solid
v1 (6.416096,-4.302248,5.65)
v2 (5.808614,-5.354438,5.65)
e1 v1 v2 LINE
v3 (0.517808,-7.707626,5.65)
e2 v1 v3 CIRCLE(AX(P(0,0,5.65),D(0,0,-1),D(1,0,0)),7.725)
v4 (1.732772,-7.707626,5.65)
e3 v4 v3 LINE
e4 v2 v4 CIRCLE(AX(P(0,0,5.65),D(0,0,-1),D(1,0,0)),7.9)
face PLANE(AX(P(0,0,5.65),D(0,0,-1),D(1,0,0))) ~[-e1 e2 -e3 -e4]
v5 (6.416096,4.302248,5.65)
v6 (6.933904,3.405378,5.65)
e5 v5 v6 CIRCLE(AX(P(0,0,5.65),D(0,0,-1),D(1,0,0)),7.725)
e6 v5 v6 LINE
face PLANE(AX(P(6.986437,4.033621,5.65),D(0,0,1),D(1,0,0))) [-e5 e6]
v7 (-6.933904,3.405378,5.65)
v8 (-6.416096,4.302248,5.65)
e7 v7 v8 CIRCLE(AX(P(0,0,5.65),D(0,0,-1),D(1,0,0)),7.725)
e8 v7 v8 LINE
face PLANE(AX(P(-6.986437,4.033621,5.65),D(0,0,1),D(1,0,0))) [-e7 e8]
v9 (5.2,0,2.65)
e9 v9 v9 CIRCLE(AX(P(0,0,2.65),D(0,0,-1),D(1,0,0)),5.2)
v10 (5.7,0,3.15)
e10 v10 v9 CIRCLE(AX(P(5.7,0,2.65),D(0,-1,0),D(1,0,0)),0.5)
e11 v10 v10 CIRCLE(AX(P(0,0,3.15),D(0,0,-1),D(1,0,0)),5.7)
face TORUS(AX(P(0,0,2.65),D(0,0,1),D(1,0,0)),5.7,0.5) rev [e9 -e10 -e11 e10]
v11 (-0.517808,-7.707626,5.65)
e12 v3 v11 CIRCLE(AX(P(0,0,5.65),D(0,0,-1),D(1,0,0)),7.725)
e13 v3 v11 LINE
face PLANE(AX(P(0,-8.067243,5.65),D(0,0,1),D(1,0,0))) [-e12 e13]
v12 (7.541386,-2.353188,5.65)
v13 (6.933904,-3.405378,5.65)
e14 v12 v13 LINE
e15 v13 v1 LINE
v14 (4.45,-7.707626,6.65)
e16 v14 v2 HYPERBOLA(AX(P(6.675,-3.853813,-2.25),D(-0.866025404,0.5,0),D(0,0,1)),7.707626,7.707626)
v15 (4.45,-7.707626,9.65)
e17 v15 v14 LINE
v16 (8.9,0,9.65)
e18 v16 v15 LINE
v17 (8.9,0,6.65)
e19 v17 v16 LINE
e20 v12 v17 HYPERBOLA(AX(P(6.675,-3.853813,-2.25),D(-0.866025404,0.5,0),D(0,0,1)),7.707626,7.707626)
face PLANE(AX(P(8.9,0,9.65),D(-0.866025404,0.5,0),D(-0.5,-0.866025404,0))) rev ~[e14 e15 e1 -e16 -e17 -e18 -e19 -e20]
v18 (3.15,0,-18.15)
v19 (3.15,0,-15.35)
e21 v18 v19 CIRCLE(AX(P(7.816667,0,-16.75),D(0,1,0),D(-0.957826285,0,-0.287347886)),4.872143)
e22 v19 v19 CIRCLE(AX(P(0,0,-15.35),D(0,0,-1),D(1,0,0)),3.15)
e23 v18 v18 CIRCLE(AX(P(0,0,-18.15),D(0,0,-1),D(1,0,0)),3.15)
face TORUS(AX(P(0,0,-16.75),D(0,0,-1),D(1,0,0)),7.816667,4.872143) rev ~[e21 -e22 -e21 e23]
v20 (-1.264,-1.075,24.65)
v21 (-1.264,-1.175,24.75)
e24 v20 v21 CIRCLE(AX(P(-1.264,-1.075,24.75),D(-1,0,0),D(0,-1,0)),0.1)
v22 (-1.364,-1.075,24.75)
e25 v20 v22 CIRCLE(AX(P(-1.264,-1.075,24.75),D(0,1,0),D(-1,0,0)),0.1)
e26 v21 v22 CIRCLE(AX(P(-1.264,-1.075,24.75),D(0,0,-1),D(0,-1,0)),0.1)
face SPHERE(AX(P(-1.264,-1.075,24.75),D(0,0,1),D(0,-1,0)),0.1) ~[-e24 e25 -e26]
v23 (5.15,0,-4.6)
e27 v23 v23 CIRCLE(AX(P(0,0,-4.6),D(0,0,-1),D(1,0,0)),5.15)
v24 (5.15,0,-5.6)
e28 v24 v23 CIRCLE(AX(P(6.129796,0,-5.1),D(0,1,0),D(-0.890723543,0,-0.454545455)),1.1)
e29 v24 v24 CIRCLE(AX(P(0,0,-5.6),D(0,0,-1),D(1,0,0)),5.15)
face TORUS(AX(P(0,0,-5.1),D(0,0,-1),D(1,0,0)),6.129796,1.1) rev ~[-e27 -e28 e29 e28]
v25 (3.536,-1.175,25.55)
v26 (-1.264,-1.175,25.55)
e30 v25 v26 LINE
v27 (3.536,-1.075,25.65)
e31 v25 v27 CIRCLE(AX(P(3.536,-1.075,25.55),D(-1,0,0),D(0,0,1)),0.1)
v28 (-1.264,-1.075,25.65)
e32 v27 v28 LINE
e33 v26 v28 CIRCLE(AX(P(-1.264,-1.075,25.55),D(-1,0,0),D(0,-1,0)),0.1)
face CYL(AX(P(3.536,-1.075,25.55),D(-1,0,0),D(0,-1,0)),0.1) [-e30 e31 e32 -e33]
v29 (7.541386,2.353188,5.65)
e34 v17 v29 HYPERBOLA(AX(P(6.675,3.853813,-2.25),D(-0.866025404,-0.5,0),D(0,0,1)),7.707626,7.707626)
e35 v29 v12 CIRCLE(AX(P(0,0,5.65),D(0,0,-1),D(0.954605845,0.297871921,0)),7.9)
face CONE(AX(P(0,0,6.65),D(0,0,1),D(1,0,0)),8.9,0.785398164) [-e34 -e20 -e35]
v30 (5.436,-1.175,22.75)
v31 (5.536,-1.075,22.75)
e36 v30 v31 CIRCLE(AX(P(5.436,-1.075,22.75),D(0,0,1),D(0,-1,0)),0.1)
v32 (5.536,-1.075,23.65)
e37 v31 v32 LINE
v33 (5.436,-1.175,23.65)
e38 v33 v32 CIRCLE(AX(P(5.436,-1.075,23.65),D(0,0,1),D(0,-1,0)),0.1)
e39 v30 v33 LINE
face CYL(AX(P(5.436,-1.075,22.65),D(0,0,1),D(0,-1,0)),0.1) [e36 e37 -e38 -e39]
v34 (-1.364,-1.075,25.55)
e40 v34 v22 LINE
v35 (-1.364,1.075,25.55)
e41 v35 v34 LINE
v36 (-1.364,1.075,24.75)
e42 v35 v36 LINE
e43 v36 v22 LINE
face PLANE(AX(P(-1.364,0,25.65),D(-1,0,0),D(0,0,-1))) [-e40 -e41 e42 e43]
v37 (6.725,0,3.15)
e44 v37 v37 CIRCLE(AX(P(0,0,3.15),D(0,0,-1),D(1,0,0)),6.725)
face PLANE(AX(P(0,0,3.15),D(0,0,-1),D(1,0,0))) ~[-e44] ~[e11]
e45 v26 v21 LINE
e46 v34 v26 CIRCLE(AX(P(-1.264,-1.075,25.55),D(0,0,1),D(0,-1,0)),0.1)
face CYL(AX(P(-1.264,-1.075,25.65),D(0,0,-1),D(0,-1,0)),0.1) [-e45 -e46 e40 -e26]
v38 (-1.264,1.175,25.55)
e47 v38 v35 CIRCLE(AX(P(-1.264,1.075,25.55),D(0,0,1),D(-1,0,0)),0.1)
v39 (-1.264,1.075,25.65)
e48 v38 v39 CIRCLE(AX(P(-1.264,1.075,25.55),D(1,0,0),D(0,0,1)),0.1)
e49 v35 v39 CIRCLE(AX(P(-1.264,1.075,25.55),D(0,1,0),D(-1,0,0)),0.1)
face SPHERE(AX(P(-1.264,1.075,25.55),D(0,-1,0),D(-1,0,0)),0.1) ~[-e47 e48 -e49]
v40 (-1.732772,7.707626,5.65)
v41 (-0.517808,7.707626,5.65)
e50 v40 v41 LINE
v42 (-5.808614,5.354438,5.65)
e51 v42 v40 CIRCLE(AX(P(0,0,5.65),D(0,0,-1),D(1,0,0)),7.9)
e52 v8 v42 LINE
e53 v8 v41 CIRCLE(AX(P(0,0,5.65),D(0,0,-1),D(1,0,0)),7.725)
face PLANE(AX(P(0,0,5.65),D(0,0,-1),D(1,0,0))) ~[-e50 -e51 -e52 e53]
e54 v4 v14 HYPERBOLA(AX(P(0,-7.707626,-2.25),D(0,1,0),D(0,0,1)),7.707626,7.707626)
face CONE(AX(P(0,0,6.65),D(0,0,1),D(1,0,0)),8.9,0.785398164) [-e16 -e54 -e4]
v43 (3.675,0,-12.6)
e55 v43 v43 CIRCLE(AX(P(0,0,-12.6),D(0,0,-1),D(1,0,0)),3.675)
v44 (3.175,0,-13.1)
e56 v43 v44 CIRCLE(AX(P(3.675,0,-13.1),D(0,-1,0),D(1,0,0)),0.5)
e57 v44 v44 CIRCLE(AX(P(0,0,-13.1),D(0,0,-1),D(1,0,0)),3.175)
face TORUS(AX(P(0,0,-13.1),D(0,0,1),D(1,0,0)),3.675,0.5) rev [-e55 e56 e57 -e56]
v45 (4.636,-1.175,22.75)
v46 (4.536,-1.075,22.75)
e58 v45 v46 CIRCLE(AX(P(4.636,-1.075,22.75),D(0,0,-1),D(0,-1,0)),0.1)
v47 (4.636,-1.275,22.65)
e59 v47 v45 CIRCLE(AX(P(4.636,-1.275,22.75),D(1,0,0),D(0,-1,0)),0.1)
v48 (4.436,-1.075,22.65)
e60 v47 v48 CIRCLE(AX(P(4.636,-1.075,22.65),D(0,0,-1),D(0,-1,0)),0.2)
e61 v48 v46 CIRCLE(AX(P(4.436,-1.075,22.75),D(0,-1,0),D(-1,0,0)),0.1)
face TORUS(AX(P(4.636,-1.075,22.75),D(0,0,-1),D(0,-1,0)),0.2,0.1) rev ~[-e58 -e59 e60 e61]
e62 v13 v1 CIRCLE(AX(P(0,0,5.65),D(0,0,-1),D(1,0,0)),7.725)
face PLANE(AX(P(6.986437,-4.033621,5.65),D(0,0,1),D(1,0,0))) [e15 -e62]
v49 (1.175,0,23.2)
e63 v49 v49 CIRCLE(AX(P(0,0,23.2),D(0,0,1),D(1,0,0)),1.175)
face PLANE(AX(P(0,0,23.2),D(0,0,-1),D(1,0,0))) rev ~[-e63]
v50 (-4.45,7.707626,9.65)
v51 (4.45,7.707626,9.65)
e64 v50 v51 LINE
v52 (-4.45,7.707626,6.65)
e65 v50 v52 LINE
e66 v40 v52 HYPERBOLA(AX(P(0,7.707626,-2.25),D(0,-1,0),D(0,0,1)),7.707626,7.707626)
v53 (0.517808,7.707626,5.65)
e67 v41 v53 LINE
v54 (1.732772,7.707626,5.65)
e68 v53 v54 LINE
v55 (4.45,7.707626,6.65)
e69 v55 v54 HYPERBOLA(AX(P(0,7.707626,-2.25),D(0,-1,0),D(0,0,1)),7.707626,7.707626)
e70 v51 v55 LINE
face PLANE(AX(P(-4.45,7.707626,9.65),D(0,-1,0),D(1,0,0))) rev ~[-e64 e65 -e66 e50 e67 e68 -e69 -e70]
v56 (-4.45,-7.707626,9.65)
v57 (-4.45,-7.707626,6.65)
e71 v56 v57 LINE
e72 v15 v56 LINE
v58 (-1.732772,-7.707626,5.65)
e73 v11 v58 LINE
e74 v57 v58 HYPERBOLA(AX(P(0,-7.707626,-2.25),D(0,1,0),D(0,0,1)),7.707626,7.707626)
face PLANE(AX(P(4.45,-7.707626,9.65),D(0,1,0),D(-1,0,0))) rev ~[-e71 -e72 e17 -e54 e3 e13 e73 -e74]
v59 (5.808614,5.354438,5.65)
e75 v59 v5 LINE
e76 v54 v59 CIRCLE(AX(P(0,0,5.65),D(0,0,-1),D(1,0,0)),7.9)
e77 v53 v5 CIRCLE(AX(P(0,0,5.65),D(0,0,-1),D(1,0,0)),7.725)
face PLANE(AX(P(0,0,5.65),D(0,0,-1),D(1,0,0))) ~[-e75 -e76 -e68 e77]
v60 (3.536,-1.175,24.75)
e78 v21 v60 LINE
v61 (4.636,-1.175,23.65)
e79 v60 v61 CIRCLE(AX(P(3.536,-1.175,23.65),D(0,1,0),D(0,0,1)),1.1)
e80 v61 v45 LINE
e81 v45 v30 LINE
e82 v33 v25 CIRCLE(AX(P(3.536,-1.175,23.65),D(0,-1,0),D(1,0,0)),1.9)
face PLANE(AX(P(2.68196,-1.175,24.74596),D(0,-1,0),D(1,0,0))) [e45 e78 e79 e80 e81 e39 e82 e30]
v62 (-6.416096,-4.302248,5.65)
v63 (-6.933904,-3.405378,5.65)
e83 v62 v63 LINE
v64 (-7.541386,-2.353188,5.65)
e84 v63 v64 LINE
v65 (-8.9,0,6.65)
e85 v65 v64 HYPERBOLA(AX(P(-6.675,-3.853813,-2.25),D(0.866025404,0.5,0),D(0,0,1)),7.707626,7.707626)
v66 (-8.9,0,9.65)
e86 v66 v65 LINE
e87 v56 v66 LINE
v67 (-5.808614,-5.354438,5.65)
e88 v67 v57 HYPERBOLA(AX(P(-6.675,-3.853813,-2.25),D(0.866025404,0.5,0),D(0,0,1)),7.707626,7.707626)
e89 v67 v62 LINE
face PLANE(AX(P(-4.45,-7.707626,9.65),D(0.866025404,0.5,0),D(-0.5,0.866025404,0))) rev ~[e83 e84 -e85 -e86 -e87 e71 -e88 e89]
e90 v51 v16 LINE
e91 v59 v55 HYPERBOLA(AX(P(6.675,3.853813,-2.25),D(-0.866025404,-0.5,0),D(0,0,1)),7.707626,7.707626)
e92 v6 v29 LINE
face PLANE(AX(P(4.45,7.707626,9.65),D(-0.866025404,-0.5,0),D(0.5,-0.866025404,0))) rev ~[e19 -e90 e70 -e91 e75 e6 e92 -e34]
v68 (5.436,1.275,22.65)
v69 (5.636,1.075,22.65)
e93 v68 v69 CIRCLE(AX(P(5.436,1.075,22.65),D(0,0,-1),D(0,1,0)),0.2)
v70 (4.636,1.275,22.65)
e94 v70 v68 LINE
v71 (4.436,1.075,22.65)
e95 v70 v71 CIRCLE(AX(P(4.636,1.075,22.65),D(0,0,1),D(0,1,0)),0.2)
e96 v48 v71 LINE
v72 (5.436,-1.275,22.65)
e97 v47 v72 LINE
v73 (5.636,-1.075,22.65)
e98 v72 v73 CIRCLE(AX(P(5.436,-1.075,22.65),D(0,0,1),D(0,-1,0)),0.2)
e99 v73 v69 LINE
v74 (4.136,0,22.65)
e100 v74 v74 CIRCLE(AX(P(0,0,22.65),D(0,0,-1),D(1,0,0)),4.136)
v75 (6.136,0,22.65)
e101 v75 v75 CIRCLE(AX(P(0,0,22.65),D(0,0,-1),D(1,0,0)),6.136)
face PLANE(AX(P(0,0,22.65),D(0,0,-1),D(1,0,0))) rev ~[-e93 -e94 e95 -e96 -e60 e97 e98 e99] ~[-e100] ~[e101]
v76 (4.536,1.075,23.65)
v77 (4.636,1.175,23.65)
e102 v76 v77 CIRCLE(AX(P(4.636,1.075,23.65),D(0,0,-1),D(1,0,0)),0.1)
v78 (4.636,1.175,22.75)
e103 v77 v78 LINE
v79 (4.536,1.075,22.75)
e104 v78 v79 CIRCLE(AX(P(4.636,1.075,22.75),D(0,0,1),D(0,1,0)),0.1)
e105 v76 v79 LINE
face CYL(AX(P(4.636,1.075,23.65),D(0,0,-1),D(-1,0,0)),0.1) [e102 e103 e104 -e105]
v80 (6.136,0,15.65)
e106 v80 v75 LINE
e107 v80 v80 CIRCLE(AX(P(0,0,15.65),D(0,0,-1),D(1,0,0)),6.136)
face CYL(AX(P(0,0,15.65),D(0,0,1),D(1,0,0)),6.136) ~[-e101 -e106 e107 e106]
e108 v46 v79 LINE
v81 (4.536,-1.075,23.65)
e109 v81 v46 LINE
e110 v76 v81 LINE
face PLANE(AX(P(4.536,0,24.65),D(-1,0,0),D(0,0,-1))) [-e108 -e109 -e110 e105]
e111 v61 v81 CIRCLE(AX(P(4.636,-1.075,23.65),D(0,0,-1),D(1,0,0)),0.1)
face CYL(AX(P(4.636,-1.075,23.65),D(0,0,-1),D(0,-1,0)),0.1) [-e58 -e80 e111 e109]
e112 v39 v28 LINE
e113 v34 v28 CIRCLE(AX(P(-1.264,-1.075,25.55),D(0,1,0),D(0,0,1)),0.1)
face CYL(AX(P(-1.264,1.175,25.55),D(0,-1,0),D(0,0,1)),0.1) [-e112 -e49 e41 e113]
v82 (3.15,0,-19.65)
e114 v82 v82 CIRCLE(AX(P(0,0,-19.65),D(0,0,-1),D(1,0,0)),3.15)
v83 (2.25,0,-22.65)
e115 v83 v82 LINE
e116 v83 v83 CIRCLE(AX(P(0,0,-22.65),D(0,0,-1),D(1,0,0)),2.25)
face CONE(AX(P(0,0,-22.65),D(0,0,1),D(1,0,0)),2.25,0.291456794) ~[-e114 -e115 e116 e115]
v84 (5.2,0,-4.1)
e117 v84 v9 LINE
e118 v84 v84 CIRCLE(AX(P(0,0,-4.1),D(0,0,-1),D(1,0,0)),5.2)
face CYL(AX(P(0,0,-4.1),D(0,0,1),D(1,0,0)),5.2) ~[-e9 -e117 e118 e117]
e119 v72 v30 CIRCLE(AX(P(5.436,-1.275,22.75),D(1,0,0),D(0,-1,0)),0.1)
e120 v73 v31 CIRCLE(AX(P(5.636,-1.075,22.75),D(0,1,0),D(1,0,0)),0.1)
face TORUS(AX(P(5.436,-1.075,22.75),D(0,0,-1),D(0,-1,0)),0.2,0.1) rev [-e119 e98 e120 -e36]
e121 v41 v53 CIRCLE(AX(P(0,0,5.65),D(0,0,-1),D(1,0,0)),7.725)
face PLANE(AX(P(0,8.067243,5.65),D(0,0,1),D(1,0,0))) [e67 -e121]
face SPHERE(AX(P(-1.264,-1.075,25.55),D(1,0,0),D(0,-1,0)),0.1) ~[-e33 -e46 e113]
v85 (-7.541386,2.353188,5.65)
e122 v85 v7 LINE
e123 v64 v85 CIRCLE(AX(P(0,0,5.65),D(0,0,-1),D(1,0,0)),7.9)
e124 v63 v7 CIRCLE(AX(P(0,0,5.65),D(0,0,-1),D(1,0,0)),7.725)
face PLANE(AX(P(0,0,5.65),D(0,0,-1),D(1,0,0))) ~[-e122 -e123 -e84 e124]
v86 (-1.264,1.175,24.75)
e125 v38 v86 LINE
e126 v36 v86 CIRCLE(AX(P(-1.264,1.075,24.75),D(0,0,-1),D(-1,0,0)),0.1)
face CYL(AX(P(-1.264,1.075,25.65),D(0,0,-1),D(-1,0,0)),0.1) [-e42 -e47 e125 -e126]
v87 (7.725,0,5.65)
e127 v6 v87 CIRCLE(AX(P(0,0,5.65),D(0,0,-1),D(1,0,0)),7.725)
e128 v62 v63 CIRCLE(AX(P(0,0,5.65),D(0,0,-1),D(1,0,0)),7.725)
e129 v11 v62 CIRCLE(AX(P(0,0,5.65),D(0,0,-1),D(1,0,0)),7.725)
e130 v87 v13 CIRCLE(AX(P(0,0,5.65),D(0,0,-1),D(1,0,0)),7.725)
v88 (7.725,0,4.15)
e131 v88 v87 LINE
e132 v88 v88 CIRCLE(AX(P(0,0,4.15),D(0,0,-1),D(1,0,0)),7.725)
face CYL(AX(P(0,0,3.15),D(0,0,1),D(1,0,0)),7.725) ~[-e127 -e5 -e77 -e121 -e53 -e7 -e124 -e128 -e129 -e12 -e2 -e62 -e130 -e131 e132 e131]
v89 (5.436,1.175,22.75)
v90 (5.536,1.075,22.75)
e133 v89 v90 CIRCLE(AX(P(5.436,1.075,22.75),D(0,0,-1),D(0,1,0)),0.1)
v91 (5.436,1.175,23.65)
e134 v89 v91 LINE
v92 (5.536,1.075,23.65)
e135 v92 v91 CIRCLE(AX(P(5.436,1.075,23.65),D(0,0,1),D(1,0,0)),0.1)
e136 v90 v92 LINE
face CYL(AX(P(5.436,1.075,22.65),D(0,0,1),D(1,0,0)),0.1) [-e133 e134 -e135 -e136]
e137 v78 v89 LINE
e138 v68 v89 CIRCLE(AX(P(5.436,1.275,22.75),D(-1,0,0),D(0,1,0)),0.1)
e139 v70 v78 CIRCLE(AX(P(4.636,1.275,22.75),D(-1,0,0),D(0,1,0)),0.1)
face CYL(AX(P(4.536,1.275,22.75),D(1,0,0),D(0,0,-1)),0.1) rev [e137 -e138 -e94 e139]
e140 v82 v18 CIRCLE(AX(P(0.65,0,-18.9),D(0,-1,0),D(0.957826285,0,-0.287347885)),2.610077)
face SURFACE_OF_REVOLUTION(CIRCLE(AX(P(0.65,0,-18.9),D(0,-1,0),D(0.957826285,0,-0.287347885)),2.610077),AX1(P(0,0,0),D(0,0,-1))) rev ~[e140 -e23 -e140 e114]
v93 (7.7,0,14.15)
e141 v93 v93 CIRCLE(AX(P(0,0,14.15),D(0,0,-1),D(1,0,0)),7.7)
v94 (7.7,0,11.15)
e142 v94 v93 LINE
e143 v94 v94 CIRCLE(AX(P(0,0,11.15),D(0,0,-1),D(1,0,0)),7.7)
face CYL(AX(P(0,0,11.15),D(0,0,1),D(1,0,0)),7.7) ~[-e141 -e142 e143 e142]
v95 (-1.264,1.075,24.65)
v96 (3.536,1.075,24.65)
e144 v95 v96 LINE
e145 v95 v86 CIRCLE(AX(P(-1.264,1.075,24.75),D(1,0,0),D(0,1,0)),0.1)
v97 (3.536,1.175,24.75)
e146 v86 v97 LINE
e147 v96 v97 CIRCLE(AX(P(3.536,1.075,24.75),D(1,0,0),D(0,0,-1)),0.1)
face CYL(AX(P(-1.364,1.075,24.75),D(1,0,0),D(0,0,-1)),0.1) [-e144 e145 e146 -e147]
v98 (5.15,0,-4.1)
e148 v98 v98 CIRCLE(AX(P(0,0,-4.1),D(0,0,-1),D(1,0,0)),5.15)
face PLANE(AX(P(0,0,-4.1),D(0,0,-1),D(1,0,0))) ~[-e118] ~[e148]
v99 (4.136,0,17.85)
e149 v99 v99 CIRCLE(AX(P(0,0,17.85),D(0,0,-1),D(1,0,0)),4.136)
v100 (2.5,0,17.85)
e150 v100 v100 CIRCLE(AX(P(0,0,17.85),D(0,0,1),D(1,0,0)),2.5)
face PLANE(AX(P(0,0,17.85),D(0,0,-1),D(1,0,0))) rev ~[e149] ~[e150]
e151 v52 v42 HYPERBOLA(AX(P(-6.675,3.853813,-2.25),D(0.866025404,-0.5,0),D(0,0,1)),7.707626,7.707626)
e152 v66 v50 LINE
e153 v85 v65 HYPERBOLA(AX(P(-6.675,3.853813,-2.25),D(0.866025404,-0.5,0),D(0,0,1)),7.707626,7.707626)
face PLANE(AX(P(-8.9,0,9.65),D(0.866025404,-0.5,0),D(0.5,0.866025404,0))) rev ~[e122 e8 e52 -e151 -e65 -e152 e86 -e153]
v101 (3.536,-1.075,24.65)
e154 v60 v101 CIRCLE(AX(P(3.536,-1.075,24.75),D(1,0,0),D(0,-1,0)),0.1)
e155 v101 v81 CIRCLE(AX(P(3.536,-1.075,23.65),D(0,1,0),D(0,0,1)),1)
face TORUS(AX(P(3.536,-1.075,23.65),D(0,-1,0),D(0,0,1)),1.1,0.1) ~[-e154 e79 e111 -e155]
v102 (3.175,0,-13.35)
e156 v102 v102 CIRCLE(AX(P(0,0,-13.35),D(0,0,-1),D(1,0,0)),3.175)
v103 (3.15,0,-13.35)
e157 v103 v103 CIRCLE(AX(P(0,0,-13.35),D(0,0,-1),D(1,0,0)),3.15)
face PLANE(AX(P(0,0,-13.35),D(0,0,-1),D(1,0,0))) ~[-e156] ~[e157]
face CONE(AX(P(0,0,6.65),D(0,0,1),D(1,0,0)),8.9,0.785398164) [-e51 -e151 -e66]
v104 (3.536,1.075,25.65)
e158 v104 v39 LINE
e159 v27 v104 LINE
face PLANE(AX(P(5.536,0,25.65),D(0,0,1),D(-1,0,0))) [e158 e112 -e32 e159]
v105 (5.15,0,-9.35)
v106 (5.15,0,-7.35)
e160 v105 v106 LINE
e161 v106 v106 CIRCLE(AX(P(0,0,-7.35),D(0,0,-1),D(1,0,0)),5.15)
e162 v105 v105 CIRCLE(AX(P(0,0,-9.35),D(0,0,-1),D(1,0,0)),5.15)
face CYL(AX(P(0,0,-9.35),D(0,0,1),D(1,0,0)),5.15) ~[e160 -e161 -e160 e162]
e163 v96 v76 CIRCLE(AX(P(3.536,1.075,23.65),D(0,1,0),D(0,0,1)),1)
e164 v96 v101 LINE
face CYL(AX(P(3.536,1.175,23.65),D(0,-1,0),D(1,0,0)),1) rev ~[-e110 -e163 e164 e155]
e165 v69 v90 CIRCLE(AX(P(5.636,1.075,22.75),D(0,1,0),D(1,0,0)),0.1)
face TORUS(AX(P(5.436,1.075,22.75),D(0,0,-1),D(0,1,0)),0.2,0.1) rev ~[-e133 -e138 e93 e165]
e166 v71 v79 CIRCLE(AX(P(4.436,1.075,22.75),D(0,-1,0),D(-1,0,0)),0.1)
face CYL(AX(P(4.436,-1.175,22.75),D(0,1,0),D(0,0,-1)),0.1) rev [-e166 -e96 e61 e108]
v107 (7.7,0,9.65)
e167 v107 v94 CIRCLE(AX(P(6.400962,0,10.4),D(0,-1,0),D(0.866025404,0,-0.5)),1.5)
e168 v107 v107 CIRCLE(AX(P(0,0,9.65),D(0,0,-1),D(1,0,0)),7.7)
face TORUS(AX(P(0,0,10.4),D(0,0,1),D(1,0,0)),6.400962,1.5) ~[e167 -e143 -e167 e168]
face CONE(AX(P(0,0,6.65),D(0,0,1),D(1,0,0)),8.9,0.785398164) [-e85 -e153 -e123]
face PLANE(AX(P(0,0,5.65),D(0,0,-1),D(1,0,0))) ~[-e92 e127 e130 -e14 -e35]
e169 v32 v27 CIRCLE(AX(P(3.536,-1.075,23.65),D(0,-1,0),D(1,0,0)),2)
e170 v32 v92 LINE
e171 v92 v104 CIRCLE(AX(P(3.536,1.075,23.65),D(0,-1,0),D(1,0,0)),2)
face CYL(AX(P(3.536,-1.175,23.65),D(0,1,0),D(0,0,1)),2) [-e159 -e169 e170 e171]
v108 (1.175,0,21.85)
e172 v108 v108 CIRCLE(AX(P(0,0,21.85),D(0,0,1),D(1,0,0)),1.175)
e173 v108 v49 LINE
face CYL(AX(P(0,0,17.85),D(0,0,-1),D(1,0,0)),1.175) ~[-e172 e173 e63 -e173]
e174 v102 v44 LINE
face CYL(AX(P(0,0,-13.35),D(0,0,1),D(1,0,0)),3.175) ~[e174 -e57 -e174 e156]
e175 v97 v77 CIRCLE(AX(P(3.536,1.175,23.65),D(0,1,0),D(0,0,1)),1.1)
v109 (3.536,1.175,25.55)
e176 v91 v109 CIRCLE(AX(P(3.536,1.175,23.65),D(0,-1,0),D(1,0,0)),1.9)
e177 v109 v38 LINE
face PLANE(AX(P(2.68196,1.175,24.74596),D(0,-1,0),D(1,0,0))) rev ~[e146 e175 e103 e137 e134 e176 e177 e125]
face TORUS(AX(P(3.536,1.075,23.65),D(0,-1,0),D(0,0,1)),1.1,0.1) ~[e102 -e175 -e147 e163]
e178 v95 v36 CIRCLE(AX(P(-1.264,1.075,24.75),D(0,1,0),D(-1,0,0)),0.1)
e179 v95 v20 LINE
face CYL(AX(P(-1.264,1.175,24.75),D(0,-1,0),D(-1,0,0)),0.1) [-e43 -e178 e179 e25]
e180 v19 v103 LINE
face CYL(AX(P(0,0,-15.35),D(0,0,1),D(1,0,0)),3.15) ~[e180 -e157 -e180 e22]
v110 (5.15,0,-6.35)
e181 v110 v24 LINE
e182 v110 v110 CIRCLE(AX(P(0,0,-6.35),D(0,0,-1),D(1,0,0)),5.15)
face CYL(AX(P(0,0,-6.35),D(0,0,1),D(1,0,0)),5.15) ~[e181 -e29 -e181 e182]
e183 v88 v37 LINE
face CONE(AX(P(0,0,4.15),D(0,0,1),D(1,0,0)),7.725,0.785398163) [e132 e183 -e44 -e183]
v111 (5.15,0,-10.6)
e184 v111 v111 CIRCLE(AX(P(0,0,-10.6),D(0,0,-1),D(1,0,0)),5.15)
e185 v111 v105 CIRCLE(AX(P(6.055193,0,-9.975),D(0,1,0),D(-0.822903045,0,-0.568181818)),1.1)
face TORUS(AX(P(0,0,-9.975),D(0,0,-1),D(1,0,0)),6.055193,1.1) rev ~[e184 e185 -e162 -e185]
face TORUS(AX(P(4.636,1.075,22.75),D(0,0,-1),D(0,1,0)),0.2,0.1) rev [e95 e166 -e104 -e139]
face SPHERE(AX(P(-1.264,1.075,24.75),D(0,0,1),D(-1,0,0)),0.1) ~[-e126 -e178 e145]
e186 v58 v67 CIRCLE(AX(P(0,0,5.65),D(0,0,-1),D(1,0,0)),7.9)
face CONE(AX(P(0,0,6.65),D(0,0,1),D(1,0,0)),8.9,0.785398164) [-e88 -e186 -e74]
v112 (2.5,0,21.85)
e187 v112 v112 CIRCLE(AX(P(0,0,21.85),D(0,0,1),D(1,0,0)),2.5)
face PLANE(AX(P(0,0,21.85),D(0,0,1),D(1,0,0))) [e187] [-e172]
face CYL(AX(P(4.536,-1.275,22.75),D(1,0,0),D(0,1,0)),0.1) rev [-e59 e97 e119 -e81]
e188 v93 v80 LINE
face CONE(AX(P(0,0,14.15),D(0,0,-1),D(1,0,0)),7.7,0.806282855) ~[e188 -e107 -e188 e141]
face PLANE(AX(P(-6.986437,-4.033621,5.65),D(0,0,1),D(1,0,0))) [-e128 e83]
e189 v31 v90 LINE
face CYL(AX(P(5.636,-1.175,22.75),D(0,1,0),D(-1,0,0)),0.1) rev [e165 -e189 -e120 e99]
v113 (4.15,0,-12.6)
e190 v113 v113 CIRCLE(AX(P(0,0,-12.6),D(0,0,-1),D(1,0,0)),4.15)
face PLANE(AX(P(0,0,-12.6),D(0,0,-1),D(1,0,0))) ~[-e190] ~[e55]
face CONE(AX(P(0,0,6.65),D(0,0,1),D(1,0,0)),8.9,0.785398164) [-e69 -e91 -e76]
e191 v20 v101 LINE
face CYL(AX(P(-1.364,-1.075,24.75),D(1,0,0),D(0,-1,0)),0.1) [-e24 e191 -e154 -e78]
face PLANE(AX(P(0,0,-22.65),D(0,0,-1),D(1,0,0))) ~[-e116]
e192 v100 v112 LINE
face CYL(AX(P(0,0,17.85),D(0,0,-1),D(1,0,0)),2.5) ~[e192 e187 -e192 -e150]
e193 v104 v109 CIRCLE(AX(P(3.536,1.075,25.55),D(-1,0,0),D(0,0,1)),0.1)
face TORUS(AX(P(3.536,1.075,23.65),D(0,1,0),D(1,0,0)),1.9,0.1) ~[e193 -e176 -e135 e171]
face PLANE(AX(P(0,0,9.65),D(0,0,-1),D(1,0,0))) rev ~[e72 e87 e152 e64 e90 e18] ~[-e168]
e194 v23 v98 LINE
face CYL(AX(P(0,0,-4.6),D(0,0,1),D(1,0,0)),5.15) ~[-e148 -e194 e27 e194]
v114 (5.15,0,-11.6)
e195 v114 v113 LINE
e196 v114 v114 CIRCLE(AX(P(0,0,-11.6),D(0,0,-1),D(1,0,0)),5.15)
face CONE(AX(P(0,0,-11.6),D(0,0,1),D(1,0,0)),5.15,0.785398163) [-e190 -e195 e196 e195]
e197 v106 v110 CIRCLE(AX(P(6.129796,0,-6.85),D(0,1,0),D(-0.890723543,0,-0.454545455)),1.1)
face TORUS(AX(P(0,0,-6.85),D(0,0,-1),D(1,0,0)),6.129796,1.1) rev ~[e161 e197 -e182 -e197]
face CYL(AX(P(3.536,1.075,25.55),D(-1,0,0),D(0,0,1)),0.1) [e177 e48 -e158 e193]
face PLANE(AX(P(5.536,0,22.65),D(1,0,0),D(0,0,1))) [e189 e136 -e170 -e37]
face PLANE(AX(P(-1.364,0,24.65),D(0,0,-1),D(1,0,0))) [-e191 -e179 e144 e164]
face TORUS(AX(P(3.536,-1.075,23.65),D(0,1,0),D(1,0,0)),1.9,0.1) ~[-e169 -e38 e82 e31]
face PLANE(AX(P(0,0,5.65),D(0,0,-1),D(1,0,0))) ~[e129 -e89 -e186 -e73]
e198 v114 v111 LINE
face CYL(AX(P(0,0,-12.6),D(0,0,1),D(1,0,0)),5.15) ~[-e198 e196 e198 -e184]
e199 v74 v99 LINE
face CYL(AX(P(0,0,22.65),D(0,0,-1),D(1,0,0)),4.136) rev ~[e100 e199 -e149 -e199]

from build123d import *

# Parameters (mm, degrees)
F3_DEPTH  = 4
F4_R      = 2.5
F4_R_2    = 1.175
F5_DEPTH  = 4
F6_DEPTH  = 5.35
F7_SIZE   = 1
F11_DEPTH = 1.175
F12_R     = 1
F13_R     = 2
F14_R     = 0.1
F15_R     = 0.5


with BuildPart() as f1:
    # F0 (on Front) → F1 (revolve)
    with BuildSketch(Plane.XZ):
        with BuildLine():
            Line((4.136, 17.85), (0, 17.85))
            Line((0, 17.85), (0, -22.65))
            Line((0, -22.65), (2.25, -22.65))
            Line((2.25, -22.65), (3.15, -19.65))
            ThreePointArc((3.15, -19.65), (3.2600766272, -18.9), (3.15, -18.15))
            ThreePointArc((3.15, -18.15), (2.9445236292, -16.75), (3.15, -15.35))
            Line((3.15, -15.35), (3.15, -13.35))
            Line((3.15, -13.35), (3.175, -13.35))
            Line((3.175, -13.35), (3.175, -12.6))
            Line((3.175, -12.6), (5.15, -12.6))
            Line((5.15, -12.6), (5.15, -10.6))
            ThreePointArc((5.15, -10.6), (4.9551933495, -9.975), (5.15, -9.35))
            Line((5.15, -9.35), (5.15, -7.35))
            ThreePointArc((5.15, -7.35), (5.0297958971, -6.85), (5.15, -6.35))
            Line((5.15, -6.35), (5.15, -5.6))
            ThreePointArc((5.15, -5.6), (5.0297958971, -5.1), (5.15, -4.6))
            Line((5.15, -4.6), (5.15, -4.1))
            Line((5.15, -4.1), (5.2, -4.1))
            Line((5.2, -4.1), (5.2, 3.15))
            Line((5.2, 3.15), (7.725, 3.15))
            Line((7.725, 3.15), (7.725, 5.65))
            Line((7.725, 5.65), (8.9, 5.65))
            Line((8.9, 5.65), (8.9, 9.65))
            Line((8.9, 9.65), (7.7, 9.65))
            ThreePointArc((7.7, 9.65), (7.9009618943, 10.4), (7.7, 11.15))
            Line((7.7, 11.15), (7.7, 14.15))
            Line((7.7, 14.15), (6.136, 15.65))
            Line((6.136, 15.65), (6.136, 22.65))
            Line((6.136, 22.65), (4.136, 22.65))
            Line((4.136, 22.65), (4.136, 17.85))
        make_face()
    revolve(axis=Axis((0, 0, 0), (0, 0, -1)))

    # F2 (on face) → F3 (cut, through all)
    with BuildSketch(Plane.XY.offset(9.65)):
        with BuildLine():
            Line((-8.9, 0), (-4.45, 7.7076260937))
            ThreePointArc((-4.45, 7.7076260937), (-7.7076260937, 4.45), (-8.9, 0))
        make_face()
        with BuildLine():
            Line((-4.45, -7.7076260937), (-8.9, 0))
            ThreePointArc((-8.9, 0), (-7.7076260937, -4.45), (-4.45, -7.7076260937))
        make_face()
        with BuildLine():
            Line((4.45, -7.7076260937), (-4.45, -7.7076260937))
            ThreePointArc((-4.45, -7.7076260937), (0, -8.9), (4.45, -7.7076260937))
        make_face()
        with BuildLine():
            ThreePointArc((4.45, -7.7076260937), (7.7076260937, -4.45), (8.9, 0))
            Line((8.9, 0), (4.45, -7.7076260937))
        make_face()
        with BuildLine():
            ThreePointArc((8.9, 0), (7.7076260937, 4.45), (4.45, 7.7076260937))
            Line((4.45, 7.7076260937), (8.9, 0))
        make_face()
        with BuildLine():
            ThreePointArc((4.45, 7.7076260937), (0, 8.9), (-4.45, 7.7076260937))
            Line((-4.45, 7.7076260937), (4.45, 7.7076260937))
        make_face()
    extrude(amount=-F3_DEPTH, mode=Mode.SUBTRACT)

    # F4 (on face) → F5 (join)
    with BuildSketch(Plane.XY.offset(17.85)):
        Circle(F4_R)
        Circle(F4_R_2, mode=Mode.SUBTRACT)
    extrude(amount=F5_DEPTH)

    # F6 (add): a face of the model
    f6_faces = [f1.faces().sort_by_distance(p)[0] for p in [
        (0, 0, 17.85),
    ]]
    extrude(f6_faces, amount=F6_DEPTH)

    # F7
    f7_edges = [f1.edges().sort_by_distance(p)[0] for p in [
        (-7.725, 0, 3.15),
        (-5.15, 0, -12.6),
    ]]
    chamfer(f7_edges, length=F7_SIZE)

    # F8 (on Front) → F9 (revolve, cut)
    with BuildSketch(Plane.XZ):
        Polygon((7.9, 5.65), (8.9, 5.65), (8.9, 6.6499999995), align=None)
    revolve(axis=Axis((0, 0, 0), (0, 0, -1)), mode=Mode.SUBTRACT)

    # F10 (on Front) → F11 (join, symmetric)
    with BuildSketch(Plane.XZ):
        Polygon((5.536, 25.65), (-1.364, 25.65), (-1.364, 24.65), (4.536, 24.65), (4.536, 22.65), (5.536, 22.65), align=None)
    extrude(amount=F11_DEPTH, both=True)

    # F12
    f12_edges = [f1.edges().sort_by_distance(p)[0] for p in [
        (4.536, 0, 24.65),
    ]]
    fillet(f12_edges, radius=F12_R)

    # F13
    f13_edges = [f1.edges().sort_by_distance(p)[0] for p in [
        (5.536, 0, 25.65),
    ]]
    fillet(f13_edges, radius=F13_R)

    # F14
    f14_edges = [f1.edges().sort_by_distance(p)[0] for p in [
        (1.086, -1.175, 25.65),
        (4.950214, -1.175, 25.064214),
        (-1.364, -1.175, 25.15),
        (5.536, -1.175, 23.15),
        (1.086, -1.175, 24.65),
        (5.036, -1.175, 22.65),
        (4.243107, -1.175, 24.357107),
        (4.536, -1.175, 23.15),
        (-1.364, 0, 25.65),
        (-1.364, 1.175, 25.15),
        (-1.364, 0, 24.65),
        (1.086, 1.175, 25.65),
        (4.950214, 1.175, 25.064214),
        (5.536, 1.175, 23.15),
        (1.086, 1.175, 24.65),
        (5.036, 1.175, 22.65),
        (4.243107, 1.175, 24.357107),
        (4.536, 1.175, 23.15),
        (5.536, 0, 22.65),
        (4.536, 0, 22.65),
    ]]
    fillet(f14_edges, radius=F14_R)

    # F15
    f15_edges = [f1.edges().sort_by_distance(p)[0] for p in [
        (-5.2, 0, 3.15),
        (-3.175, 0, -12.6),
    ]]
    fillet(f15_edges, radius=F15_R)


solid = f1.part
